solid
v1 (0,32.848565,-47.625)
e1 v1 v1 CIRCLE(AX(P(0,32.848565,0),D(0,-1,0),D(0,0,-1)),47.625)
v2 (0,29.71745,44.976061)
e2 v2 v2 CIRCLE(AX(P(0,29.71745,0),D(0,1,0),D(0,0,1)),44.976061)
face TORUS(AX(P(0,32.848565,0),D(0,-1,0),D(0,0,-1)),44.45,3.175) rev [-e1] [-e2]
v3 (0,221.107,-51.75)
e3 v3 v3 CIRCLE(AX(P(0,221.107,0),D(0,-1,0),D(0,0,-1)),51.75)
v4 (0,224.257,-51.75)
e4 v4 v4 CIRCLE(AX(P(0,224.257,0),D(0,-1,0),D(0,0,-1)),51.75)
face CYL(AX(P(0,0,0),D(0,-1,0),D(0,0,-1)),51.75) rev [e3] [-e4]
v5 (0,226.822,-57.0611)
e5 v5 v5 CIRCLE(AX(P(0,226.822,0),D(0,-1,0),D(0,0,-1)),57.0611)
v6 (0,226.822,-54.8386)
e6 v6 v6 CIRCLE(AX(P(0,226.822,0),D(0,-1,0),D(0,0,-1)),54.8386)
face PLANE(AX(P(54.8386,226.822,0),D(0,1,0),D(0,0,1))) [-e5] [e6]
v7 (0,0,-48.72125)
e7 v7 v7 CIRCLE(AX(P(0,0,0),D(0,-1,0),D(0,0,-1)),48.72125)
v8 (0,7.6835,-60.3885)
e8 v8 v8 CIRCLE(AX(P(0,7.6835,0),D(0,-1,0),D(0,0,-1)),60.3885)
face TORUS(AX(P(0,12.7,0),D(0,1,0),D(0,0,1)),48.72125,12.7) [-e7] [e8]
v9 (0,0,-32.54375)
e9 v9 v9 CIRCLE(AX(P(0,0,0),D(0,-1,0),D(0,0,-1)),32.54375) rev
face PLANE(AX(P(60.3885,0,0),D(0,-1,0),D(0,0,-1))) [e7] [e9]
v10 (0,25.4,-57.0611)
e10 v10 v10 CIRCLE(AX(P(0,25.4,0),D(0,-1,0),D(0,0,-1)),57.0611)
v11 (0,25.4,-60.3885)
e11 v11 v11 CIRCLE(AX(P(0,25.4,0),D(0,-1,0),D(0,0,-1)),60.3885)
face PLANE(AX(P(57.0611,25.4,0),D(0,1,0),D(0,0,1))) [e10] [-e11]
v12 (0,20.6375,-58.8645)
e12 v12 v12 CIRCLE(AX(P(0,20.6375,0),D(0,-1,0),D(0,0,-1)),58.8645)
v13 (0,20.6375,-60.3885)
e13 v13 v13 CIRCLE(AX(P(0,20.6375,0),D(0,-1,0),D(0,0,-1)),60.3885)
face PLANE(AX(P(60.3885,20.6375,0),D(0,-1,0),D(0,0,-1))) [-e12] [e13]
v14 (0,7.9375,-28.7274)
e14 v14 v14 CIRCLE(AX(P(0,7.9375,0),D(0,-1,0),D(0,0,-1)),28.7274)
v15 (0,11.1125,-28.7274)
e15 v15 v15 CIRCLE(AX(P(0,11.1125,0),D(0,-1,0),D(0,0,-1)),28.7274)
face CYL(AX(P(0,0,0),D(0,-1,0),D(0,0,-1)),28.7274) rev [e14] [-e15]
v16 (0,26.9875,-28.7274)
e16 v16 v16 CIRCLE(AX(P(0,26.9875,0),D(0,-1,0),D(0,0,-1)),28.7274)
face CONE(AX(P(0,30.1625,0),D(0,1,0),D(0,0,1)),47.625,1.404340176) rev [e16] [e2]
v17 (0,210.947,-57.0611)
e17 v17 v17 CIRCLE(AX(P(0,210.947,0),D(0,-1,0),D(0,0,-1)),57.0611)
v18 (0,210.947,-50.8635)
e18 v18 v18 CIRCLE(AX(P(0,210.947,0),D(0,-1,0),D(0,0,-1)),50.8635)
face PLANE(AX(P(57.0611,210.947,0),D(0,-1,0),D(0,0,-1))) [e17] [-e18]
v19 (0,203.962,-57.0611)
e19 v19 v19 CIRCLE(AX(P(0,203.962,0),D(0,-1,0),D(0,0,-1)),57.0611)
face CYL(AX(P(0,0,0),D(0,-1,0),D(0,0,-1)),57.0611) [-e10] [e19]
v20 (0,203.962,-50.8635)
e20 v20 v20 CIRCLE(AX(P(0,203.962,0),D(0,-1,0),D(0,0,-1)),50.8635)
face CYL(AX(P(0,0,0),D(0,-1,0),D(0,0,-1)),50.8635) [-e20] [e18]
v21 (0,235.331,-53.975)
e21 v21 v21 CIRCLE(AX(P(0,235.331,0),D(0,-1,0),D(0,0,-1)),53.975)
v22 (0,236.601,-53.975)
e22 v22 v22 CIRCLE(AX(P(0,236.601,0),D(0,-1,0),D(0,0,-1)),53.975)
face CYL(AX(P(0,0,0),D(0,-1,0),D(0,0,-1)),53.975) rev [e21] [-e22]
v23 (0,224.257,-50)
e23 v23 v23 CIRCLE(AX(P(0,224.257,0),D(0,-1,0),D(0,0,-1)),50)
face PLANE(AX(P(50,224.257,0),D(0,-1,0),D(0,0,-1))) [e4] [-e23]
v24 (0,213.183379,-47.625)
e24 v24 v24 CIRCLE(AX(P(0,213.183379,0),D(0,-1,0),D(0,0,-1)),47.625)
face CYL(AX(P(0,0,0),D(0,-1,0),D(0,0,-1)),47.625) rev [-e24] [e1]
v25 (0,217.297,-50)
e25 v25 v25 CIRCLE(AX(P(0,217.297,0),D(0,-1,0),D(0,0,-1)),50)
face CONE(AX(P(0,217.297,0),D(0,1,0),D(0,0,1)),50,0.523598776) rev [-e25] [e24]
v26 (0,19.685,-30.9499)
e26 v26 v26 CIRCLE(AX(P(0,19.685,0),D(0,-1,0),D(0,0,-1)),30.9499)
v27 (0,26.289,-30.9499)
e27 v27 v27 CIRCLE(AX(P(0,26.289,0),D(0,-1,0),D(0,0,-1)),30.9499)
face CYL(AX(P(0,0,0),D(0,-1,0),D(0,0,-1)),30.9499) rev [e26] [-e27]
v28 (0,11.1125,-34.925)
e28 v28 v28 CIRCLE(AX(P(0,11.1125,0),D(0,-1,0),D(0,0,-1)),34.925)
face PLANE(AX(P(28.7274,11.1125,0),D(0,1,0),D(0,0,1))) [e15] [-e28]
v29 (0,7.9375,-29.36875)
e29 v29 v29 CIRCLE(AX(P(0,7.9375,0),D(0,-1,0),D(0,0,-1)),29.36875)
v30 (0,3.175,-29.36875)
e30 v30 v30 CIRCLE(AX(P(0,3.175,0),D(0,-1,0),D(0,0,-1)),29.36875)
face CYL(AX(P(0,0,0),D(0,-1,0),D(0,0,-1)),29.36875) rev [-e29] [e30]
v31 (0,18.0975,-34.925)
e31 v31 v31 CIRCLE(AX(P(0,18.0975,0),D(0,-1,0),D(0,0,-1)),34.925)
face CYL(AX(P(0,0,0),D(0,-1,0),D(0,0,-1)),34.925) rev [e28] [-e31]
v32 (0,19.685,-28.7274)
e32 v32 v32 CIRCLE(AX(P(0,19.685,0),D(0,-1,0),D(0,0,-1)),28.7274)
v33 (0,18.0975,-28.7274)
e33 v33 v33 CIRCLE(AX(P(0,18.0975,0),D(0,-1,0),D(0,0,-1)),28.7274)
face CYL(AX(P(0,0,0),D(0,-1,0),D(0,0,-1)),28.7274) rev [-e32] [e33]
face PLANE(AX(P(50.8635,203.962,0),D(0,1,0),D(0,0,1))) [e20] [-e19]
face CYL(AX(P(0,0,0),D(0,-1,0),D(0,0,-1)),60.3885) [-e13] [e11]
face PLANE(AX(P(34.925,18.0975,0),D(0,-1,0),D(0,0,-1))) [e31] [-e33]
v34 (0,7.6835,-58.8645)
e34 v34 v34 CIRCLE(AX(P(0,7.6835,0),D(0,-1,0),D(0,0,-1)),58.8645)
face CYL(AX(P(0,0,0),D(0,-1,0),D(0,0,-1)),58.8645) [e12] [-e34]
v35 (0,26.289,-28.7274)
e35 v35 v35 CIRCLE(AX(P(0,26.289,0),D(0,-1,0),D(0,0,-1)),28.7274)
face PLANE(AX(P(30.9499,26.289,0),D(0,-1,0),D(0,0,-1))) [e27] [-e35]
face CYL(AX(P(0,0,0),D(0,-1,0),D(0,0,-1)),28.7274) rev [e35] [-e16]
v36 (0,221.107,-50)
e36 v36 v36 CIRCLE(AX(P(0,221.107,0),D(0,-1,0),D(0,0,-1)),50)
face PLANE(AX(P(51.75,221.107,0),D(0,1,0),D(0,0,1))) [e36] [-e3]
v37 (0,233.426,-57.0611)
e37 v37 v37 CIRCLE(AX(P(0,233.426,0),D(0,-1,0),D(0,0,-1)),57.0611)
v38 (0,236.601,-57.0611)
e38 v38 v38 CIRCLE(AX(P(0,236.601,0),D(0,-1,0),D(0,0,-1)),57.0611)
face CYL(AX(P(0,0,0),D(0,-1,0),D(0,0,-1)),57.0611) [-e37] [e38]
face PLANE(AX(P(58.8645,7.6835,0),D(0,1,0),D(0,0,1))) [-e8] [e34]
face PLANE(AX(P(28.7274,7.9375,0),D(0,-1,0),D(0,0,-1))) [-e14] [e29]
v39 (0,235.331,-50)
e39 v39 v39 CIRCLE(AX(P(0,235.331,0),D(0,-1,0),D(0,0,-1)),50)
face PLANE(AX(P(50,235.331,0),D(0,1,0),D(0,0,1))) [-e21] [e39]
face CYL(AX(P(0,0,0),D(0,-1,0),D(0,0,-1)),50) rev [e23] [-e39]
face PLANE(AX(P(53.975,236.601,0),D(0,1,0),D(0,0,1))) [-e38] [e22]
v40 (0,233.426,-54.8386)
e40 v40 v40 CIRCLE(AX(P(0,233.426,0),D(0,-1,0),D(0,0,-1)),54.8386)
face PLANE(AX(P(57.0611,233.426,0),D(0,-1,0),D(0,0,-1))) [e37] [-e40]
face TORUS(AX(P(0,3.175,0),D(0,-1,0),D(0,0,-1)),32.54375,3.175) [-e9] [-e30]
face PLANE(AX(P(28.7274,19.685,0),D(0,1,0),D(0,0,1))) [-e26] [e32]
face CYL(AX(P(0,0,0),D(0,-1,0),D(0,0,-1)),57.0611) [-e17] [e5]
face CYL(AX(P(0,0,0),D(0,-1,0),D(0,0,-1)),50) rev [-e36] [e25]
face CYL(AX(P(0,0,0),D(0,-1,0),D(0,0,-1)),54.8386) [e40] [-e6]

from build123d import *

# Parameters (mm, degrees)
FILLET1_R = 3.175
FILLET5_R = 12.7
FILLET6_R = 3.175


with BuildPart() as part:
    # Sketch1 → Revolve1 (revolve)
    with BuildSketch(Plane.XY, mode=Mode.PRIVATE) as revolve1_sk:
        Polygon((28.7274, 7.9375), (29.36875, 7.9375), (29.36875, 0), (60.3885, 0), (60.3885, 7.6835), (58.8645, 7.6835), (58.8645, 20.6375), (60.3885, 20.6375), (60.3885, 25.4), (57.0611, 25.4), (57.0611, 197.612), (57.0611, 203.962), (50.8635, 203.962), (50.8635, 210.947), (57.0611, 210.947), (57.0611, 226.822), (54.8386, 226.822), (54.8386, 233.426), (57.0611, 233.426), (57.0611, 236.601), (53.975, 236.601), (53.975, 235.331), (50, 235.331), (50, 224.25700005), (51.75, 224.25700005), (51.75, 221.107), (50, 221.107), (50, 217.297), (47.625, 213.183379332), (47.625, 30.1625), (28.7274, 26.9875), (28.7274, 26.289), (30.9499, 26.289), (30.9499, 19.685), (28.7274, 19.685), (28.7274, 18.0975), (34.925, 18.0975), (34.925, 11.1125), (28.7274, 11.1125), align=None)
    revolve(revolve1_sk.sketch.rotate(Axis((0, 0, 0), (0, 1, 0)), 90), axis=Axis((0, 0, 0), (0, 1, 0)))

    # Fillet1
    fillet1_edges = [part.edges().sort_by_distance(p)[0] for p in [
        (0, 30.1625, 47.625),
    ]]
    fillet(fillet1_edges, radius=FILLET1_R)

    # Fillet5
    # the kernel refuses this fillet: 12.7 mm, written as the material it takes off along each edge
    with BuildSketch(Plane(origin=(0, 0, 0), x_dir=(0, 0, -1), z_dir=(1, 0, 0))) as fillet5_piece_1:
        with BuildLine():
            CenterArc((48.721249778, 12.7), FILLET5_R, 270, 66.734025938)
            Line((60.3885, 7.6835), (60.621845004, 7.58317))
            ThreePointArc((60.621845004, 7.58317), (60.6425, 3.84175), (60.6425, 0))
            Line((60.6425, 0), (60.3885, -0.254))
            Line((60.3885, -0.254), (48.721249778, -0.254))
            Line((48.721249778, -0.254), (48.721249778, 0))
        make_face()
    revolve(axis=Axis((0, 0, 0), (0, 1, 0)), mode=Mode.SUBTRACT)

    # Fillet6
    fillet6_edges = [part.edges().sort_by_distance(p)[0] for p in [
        (0, 0, 29.36875),
    ]]
    fillet(fillet6_edges, radius=FILLET6_R)


solid = part.part
